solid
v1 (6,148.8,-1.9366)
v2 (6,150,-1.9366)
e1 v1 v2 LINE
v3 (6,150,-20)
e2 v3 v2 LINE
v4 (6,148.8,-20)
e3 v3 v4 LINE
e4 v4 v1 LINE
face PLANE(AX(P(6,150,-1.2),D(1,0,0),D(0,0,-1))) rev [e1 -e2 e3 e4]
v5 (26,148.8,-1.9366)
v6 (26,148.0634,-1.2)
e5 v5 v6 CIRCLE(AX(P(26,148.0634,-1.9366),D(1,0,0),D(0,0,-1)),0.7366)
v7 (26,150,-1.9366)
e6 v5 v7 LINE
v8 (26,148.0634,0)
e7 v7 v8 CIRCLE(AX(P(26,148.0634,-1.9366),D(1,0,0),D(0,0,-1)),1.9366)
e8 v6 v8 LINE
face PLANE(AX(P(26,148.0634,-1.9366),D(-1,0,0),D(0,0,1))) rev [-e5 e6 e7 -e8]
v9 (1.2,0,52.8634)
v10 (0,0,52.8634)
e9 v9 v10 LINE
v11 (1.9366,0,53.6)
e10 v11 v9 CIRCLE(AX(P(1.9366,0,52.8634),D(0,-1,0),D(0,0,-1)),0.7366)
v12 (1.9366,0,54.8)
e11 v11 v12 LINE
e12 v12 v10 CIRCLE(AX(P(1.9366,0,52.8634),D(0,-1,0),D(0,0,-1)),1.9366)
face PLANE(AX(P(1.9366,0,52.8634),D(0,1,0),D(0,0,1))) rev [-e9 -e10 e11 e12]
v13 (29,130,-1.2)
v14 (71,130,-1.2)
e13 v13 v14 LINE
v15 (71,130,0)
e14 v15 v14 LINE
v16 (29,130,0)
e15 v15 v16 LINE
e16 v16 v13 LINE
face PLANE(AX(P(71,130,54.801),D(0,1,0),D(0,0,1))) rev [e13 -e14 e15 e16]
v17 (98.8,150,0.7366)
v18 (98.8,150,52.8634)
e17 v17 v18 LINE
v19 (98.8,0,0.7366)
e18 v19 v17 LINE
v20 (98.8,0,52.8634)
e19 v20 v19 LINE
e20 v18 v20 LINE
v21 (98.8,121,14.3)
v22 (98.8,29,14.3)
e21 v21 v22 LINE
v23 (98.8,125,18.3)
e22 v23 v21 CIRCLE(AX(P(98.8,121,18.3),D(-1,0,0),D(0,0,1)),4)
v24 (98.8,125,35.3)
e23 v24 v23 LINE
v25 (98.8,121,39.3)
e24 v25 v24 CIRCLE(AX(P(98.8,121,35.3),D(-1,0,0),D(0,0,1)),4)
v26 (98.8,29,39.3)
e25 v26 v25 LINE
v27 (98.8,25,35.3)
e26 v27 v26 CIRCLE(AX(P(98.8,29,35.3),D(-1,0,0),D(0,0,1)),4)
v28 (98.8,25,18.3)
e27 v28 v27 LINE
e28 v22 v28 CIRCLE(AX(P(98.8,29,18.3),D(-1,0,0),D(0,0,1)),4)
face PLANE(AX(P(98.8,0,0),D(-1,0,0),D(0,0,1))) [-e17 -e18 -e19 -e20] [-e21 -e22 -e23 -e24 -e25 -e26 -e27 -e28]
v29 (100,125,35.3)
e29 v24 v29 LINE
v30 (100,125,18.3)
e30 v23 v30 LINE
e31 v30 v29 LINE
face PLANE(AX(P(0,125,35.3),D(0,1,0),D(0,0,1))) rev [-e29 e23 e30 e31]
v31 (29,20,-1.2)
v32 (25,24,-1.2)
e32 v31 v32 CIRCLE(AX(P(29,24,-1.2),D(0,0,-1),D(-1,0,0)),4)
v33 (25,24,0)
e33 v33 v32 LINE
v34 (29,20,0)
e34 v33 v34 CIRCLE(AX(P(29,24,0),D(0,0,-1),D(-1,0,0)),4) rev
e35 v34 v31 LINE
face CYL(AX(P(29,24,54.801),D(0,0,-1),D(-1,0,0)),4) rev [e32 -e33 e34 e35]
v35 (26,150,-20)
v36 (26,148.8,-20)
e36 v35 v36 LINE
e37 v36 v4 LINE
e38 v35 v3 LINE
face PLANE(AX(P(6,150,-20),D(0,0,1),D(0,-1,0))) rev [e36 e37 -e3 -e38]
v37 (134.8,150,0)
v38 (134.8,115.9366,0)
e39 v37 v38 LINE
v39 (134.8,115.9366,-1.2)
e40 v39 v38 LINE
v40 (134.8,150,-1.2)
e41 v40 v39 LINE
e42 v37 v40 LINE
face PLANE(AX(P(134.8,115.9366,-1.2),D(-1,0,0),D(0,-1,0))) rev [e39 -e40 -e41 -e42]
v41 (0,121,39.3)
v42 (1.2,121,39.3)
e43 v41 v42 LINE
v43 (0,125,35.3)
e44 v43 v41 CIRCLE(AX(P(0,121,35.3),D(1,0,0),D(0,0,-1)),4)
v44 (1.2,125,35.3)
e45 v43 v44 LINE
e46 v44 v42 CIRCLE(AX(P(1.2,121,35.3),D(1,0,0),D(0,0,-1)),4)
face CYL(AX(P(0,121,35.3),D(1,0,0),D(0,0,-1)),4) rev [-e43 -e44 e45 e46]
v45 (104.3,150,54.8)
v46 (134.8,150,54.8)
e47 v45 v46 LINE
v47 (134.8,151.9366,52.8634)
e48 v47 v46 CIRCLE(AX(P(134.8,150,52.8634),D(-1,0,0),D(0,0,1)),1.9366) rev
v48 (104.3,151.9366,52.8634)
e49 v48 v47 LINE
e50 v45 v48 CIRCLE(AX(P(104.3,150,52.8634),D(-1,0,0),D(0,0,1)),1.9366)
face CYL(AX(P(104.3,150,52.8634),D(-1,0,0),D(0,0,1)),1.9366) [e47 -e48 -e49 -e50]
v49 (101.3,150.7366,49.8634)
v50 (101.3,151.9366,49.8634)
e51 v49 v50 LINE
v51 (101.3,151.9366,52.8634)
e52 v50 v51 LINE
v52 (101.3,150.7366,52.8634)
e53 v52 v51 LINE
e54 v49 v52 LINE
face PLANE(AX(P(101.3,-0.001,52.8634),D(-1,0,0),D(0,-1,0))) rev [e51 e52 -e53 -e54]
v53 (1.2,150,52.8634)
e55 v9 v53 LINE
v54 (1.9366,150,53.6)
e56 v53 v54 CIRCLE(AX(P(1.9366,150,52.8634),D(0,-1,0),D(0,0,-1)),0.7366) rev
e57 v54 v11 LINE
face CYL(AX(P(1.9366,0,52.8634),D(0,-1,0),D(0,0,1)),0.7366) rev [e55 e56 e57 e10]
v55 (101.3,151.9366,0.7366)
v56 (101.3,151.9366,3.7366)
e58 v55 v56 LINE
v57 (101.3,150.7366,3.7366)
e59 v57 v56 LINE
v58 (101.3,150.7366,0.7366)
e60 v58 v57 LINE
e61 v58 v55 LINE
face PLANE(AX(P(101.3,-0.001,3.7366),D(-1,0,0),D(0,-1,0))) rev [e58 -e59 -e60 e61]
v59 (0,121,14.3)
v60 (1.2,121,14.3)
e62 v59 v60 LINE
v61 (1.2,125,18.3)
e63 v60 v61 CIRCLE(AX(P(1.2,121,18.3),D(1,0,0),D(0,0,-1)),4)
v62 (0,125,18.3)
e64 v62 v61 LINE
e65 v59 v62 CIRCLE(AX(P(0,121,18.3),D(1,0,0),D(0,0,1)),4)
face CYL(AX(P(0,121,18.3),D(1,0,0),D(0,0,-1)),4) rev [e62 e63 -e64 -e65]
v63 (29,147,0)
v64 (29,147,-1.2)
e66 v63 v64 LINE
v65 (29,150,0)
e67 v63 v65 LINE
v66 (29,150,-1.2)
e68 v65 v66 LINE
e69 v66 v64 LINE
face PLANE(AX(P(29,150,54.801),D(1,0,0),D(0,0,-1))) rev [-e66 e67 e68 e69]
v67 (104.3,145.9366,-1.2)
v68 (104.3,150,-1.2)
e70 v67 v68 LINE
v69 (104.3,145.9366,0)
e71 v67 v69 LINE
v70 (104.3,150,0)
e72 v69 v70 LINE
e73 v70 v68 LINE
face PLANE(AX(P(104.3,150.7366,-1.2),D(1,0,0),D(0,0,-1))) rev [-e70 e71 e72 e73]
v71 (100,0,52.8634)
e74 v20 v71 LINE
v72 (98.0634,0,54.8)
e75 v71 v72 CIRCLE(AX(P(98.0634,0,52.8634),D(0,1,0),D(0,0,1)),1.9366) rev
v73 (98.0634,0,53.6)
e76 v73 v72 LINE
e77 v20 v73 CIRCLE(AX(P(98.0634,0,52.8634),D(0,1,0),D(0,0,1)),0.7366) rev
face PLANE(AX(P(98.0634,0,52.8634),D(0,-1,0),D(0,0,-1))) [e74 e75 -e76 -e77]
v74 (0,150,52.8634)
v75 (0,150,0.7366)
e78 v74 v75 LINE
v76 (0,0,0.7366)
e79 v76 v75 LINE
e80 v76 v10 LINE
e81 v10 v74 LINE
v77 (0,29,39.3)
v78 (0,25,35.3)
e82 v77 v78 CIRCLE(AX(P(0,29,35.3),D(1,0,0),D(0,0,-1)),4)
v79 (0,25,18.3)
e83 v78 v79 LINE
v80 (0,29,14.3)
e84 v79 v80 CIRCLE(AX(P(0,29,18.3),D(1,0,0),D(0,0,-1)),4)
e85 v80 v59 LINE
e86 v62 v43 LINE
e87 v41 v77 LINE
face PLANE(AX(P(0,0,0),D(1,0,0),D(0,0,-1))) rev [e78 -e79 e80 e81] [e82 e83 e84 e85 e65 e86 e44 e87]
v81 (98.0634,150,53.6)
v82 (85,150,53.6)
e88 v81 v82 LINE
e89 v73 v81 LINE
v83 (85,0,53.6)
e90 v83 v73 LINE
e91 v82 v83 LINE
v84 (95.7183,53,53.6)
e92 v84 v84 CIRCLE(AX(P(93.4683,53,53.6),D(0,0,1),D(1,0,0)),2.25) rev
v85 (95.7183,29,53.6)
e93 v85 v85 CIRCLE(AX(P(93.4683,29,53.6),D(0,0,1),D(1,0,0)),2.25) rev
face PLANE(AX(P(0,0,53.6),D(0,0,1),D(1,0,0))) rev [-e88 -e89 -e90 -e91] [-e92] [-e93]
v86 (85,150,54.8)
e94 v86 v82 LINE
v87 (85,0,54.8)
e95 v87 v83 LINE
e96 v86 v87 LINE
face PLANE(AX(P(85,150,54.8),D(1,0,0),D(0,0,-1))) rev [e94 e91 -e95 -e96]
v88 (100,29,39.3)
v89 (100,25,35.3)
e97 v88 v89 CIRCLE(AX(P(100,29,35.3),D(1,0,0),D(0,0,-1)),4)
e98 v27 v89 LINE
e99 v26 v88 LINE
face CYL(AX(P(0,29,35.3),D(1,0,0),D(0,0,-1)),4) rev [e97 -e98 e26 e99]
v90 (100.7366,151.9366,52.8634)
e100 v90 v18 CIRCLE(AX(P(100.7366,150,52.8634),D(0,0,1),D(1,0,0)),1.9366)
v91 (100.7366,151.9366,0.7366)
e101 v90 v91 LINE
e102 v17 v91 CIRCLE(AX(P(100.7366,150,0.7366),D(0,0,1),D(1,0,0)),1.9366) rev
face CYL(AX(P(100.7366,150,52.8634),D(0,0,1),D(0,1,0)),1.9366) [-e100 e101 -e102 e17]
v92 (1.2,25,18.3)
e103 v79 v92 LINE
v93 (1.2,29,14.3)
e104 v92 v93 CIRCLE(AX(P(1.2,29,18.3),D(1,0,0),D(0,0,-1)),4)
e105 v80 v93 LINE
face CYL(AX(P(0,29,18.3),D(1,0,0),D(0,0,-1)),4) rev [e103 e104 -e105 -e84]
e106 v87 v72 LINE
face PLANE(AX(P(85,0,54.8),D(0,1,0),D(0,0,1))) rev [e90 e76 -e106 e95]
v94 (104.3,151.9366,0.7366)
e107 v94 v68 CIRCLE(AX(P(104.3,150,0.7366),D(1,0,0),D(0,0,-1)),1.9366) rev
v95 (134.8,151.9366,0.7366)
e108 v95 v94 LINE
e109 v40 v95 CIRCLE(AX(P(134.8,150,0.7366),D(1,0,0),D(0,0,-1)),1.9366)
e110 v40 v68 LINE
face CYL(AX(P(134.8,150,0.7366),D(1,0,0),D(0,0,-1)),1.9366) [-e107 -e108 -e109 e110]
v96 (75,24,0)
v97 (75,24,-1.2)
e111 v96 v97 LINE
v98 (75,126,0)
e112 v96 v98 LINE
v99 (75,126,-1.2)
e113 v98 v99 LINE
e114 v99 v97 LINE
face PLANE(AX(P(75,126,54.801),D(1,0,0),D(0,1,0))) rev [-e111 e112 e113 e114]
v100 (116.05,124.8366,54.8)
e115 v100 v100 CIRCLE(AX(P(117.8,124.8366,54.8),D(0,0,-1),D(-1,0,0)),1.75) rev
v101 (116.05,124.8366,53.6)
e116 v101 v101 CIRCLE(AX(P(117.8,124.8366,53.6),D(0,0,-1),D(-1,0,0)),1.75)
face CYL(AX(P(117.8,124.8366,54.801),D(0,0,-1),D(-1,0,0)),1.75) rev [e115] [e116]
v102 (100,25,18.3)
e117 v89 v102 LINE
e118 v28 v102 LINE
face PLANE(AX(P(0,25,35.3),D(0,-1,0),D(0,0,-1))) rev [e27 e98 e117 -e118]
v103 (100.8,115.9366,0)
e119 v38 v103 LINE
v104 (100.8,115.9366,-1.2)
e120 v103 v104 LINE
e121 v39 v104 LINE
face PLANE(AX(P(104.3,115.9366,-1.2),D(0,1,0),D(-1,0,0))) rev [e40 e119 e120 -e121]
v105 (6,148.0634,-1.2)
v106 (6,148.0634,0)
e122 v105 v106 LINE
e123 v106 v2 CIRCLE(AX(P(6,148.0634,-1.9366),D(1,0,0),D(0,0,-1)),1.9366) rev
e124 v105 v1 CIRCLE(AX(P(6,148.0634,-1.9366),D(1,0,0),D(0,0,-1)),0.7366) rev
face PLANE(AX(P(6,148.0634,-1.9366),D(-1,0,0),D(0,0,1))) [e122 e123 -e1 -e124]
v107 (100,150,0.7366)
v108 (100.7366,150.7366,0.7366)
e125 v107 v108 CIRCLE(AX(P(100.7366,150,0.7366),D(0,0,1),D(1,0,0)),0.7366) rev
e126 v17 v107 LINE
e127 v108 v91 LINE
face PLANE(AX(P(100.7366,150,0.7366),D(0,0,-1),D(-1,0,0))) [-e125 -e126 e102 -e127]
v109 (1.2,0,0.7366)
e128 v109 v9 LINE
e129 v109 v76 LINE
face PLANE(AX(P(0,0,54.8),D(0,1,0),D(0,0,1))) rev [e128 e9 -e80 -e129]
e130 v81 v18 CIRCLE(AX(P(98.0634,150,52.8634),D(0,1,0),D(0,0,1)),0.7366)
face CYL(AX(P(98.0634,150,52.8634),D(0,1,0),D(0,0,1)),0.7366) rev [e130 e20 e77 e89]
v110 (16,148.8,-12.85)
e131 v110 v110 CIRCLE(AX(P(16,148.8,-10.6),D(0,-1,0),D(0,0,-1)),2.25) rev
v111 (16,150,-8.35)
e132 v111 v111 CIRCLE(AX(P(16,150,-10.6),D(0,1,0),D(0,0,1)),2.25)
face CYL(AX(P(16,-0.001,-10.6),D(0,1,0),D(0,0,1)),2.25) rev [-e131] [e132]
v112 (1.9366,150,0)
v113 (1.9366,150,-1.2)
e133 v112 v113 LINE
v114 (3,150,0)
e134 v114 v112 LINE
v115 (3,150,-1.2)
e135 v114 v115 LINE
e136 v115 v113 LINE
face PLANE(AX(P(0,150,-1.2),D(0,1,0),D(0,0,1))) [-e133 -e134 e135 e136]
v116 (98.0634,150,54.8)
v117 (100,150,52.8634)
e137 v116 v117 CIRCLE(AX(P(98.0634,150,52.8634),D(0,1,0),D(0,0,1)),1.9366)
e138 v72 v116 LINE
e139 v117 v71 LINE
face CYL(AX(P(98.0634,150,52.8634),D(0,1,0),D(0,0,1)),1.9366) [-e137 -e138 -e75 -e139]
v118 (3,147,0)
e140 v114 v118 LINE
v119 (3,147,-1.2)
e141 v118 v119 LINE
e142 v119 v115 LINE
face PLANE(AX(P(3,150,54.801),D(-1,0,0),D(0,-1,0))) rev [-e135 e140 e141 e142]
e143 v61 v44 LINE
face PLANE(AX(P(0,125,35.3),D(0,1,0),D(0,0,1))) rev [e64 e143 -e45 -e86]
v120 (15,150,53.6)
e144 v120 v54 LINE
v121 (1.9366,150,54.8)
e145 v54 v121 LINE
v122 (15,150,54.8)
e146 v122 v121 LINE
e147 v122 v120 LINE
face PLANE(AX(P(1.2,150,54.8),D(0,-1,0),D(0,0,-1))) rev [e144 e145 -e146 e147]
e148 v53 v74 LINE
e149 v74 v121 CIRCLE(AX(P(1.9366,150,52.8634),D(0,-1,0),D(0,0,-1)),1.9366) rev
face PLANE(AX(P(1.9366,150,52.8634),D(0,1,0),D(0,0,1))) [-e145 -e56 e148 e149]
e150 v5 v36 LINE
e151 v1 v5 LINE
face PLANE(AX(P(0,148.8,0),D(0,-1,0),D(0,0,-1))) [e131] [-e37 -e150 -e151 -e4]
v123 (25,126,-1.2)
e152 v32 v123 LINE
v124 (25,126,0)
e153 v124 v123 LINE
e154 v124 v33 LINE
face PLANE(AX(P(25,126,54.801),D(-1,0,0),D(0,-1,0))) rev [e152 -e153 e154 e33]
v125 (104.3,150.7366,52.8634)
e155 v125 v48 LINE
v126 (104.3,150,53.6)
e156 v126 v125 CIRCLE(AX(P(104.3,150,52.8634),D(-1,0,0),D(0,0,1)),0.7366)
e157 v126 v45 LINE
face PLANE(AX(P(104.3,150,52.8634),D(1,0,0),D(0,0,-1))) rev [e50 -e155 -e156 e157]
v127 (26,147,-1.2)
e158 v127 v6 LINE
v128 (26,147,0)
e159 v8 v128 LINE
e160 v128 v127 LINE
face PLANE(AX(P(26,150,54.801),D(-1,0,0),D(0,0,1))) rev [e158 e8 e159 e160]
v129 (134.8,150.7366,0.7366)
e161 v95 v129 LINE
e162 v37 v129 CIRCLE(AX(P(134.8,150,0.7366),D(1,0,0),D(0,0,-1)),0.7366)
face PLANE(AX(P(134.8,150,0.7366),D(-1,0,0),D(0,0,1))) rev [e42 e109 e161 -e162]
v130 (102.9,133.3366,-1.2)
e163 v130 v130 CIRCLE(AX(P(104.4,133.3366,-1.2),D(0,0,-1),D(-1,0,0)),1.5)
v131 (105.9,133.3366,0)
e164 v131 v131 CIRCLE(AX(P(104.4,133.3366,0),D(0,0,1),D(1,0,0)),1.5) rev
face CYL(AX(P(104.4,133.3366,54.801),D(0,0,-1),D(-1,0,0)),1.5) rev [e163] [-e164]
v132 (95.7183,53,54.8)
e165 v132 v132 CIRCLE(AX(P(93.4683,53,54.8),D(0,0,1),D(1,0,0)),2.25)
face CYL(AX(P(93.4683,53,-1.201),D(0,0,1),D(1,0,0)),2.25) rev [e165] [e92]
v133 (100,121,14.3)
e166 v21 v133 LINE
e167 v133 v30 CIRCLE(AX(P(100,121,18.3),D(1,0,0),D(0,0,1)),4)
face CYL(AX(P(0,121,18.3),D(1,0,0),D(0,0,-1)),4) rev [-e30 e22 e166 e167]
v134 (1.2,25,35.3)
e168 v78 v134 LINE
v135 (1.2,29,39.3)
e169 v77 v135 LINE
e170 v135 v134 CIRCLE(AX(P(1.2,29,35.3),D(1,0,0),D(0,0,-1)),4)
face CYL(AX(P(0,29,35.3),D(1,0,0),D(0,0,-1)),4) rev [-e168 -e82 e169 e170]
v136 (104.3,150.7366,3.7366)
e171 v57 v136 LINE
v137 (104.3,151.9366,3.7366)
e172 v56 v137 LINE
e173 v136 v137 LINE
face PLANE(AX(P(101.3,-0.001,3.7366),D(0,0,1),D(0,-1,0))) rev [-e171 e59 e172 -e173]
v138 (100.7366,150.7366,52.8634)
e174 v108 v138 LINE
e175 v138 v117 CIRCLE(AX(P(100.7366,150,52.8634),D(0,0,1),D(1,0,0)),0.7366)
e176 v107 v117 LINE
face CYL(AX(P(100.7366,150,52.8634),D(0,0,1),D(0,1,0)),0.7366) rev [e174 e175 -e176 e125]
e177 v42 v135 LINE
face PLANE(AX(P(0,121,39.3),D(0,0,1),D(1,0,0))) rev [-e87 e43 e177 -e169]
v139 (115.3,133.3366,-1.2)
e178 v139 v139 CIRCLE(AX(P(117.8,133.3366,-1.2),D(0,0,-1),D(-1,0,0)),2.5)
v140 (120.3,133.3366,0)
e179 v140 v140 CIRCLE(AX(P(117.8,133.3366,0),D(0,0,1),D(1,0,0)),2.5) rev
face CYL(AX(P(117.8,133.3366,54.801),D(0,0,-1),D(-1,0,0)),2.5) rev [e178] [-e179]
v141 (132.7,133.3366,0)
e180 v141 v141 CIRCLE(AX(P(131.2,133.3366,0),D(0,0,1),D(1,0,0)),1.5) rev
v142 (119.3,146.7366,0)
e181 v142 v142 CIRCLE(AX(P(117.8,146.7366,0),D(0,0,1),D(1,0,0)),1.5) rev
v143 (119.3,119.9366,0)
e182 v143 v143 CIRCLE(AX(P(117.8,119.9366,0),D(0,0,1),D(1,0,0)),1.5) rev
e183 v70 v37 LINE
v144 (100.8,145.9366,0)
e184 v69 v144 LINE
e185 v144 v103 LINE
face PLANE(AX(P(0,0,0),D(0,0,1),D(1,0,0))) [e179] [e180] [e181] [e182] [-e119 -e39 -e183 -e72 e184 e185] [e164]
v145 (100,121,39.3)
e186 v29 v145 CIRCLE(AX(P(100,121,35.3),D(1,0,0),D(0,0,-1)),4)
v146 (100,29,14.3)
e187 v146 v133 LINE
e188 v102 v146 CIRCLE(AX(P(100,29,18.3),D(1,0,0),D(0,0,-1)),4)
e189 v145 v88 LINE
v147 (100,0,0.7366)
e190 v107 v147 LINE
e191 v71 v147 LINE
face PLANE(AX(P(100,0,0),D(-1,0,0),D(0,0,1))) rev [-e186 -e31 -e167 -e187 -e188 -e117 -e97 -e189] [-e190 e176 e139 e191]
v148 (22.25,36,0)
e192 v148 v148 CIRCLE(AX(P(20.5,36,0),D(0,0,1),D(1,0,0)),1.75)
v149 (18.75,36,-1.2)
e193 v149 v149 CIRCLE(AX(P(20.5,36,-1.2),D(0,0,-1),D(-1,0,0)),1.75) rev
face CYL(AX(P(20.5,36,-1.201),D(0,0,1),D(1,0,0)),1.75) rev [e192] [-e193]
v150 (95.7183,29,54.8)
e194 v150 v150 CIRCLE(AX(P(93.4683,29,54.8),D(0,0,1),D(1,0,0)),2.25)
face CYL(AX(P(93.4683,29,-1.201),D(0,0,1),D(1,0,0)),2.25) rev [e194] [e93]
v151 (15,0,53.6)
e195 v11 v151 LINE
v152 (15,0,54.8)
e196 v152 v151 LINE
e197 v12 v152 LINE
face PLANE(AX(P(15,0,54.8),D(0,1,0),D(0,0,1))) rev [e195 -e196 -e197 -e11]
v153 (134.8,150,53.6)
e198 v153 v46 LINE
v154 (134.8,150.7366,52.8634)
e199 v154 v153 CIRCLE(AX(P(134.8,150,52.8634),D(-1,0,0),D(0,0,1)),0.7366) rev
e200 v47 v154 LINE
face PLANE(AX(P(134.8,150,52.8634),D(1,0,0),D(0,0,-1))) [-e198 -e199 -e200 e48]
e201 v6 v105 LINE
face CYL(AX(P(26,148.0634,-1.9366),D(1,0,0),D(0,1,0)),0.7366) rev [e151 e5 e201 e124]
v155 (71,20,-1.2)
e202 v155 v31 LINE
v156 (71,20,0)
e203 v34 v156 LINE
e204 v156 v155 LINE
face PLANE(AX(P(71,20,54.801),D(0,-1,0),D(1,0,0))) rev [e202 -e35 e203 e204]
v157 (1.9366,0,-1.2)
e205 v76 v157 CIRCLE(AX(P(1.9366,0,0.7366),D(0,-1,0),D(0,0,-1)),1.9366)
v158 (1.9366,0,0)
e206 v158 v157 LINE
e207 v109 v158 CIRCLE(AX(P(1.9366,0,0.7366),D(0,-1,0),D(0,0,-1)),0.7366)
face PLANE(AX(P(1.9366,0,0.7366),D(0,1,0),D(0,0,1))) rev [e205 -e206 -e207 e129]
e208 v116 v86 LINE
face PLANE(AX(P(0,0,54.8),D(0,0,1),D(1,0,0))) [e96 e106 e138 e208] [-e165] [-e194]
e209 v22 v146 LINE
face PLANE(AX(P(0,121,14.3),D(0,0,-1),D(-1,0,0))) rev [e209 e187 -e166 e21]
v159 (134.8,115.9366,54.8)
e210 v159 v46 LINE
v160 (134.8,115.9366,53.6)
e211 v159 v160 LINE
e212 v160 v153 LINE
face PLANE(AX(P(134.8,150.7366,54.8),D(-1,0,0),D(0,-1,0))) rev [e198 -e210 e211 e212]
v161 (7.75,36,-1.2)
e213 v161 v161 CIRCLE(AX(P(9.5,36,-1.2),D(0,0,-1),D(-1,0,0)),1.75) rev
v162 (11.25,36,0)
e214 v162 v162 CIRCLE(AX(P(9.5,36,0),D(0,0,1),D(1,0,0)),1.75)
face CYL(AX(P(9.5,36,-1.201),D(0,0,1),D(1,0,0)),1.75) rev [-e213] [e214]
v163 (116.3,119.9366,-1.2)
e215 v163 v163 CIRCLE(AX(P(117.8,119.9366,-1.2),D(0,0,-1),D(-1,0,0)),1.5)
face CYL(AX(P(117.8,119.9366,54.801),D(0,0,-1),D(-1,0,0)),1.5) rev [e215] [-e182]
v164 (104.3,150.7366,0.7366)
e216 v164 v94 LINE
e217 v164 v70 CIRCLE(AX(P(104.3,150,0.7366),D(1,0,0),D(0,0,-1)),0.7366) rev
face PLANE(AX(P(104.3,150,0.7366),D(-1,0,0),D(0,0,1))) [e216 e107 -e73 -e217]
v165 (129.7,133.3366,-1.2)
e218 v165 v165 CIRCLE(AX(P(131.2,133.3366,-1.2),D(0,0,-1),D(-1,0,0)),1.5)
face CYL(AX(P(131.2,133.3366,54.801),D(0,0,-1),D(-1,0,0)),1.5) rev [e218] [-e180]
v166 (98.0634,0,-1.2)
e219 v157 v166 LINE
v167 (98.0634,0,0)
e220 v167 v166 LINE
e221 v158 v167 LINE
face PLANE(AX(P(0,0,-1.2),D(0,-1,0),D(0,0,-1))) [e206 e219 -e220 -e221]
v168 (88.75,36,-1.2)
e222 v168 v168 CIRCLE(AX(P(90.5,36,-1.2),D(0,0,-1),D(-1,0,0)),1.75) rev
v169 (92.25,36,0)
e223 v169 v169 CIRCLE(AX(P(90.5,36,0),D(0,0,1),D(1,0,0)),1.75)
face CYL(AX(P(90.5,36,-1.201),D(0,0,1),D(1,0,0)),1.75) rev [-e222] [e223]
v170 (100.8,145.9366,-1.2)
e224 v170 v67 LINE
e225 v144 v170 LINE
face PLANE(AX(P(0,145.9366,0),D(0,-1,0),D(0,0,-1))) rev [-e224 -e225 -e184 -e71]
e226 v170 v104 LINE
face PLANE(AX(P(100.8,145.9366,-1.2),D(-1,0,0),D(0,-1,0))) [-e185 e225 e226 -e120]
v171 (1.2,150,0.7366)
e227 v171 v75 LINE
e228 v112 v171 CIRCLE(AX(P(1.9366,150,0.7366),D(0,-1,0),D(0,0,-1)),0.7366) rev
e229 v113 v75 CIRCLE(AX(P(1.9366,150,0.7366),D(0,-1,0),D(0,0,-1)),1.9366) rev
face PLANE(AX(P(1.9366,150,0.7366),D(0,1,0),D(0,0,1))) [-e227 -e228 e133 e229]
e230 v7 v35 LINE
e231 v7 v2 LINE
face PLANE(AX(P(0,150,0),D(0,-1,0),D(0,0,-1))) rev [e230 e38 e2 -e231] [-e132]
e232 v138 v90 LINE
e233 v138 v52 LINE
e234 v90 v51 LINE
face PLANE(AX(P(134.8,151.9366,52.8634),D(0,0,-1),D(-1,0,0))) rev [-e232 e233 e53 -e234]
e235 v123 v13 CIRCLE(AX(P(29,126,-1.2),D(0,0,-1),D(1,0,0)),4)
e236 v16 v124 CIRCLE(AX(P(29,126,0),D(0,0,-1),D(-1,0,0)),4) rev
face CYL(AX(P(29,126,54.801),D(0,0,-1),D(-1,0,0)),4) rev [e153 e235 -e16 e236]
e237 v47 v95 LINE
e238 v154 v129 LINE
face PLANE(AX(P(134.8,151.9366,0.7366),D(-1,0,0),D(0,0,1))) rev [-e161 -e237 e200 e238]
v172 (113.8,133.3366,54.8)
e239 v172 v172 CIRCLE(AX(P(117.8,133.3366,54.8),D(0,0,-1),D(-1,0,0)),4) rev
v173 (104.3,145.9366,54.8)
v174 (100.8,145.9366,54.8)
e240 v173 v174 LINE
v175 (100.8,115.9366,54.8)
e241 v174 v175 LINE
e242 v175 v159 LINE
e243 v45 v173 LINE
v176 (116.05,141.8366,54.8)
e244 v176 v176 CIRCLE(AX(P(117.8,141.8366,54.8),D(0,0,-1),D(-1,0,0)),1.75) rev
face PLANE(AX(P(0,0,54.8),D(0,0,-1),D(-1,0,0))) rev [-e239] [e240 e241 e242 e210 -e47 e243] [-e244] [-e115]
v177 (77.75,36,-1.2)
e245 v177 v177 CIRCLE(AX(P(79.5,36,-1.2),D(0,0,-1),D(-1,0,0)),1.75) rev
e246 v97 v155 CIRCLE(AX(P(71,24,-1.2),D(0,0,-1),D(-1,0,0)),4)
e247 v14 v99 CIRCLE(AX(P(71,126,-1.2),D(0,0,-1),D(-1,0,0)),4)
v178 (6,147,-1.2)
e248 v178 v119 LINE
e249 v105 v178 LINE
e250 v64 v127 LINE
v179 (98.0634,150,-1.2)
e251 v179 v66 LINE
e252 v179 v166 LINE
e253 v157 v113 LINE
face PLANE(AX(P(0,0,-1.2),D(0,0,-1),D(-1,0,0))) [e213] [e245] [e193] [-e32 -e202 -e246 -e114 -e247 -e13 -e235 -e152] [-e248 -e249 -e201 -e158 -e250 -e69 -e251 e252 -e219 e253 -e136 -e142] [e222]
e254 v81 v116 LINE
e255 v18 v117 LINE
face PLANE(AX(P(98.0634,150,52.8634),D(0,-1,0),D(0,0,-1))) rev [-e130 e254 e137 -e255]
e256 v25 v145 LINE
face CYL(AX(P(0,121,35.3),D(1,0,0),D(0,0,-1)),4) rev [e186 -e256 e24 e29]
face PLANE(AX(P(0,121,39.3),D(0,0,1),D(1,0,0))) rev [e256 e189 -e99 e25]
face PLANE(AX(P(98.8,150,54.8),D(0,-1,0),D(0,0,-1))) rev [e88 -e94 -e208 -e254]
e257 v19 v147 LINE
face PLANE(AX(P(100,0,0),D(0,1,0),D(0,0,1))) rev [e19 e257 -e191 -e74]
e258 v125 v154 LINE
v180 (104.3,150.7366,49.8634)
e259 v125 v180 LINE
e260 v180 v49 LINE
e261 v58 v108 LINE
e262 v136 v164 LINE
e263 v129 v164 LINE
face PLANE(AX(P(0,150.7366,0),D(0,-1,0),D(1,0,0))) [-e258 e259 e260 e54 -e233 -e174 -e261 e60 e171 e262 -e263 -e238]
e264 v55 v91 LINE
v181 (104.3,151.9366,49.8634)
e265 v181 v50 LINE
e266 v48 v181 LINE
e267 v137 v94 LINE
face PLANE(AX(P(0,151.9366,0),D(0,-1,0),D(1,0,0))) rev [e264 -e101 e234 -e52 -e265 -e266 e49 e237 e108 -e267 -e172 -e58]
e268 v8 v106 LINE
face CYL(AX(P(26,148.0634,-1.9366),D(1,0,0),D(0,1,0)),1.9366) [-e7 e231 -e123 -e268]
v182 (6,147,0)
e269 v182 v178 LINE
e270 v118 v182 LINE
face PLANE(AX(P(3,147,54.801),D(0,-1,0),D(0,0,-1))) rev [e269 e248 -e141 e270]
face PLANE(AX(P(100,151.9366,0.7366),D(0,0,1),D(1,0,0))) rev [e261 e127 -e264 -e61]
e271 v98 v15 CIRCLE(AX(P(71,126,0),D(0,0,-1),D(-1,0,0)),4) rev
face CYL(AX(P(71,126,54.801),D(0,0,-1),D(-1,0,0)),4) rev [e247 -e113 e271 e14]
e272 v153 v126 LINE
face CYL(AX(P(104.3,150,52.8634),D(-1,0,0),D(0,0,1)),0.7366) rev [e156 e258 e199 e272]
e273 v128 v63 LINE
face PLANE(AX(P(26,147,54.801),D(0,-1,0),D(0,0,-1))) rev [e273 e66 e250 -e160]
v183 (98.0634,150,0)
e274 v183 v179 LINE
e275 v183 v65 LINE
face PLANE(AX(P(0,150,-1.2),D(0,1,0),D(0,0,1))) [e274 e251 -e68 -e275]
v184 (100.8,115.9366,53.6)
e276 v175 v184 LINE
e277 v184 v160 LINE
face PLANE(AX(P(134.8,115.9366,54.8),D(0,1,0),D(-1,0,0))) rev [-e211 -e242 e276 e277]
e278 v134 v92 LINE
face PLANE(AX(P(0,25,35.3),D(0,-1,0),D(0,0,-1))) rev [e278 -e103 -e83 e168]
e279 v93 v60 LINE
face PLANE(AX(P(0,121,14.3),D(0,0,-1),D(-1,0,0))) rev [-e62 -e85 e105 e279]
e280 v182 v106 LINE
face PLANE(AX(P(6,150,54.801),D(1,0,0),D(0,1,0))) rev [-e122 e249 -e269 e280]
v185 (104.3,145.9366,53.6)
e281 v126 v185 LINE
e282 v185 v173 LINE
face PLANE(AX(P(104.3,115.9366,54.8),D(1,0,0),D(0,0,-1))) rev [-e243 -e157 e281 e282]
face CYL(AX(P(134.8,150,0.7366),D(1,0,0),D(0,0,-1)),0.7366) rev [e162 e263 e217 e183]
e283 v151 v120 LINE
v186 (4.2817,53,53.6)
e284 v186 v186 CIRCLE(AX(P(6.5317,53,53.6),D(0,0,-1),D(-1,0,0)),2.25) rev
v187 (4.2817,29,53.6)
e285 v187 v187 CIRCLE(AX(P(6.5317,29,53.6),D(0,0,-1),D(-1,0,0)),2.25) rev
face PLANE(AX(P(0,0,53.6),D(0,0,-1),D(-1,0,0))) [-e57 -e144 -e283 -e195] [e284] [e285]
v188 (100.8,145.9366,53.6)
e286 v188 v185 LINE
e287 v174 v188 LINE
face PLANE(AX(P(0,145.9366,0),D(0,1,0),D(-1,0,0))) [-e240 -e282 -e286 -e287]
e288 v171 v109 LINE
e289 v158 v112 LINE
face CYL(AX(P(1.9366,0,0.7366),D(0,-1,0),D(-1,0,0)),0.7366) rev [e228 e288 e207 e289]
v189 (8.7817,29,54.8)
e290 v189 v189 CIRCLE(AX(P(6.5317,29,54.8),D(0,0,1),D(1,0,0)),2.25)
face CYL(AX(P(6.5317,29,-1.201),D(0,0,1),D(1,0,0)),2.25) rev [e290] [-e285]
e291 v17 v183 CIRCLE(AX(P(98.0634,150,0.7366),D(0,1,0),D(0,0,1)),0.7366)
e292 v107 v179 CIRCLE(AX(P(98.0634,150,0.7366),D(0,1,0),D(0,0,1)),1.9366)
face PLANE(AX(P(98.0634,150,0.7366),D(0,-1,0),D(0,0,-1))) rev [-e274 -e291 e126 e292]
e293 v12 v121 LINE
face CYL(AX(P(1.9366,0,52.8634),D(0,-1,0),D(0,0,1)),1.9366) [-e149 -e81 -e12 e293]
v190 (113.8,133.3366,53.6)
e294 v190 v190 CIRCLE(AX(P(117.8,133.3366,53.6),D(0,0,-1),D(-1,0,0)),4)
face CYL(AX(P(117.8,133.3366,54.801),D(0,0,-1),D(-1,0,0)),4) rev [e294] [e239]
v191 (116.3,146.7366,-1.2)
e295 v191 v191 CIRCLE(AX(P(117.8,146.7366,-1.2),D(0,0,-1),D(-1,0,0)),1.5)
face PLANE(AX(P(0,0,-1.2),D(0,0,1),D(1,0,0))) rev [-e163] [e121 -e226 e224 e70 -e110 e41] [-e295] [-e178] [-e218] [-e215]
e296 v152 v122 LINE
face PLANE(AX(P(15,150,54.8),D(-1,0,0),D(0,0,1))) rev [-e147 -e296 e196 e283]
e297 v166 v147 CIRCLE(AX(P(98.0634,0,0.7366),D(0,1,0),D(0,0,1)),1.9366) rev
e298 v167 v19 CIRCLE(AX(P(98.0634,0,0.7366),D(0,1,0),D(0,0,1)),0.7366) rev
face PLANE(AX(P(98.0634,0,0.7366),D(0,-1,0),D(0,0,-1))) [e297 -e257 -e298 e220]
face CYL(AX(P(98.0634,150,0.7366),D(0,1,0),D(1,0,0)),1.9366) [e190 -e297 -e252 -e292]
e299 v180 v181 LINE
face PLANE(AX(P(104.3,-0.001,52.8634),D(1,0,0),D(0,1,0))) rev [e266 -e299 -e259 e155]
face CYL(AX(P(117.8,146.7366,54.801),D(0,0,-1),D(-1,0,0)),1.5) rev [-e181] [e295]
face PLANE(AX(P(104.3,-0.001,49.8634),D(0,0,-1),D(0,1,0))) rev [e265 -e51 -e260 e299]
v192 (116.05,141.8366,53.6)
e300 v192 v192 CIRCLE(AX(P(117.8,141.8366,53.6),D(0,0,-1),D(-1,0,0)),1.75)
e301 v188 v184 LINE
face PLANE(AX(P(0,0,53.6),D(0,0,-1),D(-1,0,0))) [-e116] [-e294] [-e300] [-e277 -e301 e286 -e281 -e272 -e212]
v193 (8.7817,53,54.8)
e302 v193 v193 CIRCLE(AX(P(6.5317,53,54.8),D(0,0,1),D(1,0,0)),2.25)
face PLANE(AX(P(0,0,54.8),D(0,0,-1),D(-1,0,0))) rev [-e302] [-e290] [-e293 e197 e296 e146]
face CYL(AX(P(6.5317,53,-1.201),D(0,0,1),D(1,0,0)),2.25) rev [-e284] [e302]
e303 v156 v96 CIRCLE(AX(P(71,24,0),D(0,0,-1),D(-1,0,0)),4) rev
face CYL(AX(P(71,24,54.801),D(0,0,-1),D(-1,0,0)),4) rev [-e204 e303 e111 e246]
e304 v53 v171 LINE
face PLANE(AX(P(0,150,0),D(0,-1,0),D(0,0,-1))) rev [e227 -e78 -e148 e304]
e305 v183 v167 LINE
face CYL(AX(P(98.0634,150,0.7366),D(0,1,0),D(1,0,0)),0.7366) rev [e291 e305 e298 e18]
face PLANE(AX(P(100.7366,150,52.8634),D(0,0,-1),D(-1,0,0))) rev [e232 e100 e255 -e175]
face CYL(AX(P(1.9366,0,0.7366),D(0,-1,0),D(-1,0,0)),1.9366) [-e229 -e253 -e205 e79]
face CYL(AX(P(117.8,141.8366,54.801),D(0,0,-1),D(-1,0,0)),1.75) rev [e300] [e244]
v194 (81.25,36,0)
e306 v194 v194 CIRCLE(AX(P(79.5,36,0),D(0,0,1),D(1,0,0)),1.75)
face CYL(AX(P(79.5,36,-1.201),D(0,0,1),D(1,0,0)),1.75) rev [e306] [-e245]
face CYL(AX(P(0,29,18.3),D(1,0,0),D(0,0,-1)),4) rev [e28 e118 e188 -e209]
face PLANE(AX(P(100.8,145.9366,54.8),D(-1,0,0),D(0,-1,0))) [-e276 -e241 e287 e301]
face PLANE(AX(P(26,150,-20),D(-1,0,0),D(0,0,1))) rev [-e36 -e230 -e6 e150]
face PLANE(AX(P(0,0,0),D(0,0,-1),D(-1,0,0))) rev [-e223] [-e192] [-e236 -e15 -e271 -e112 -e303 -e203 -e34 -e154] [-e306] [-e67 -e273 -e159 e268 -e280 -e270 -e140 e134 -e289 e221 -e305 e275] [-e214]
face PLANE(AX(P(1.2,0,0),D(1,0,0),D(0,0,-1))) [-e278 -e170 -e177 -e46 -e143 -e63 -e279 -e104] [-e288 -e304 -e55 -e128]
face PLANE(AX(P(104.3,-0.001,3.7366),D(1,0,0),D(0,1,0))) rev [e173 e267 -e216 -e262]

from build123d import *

# Parameters (mm, degrees)
SKETCH_1_W                         = 100
SKETCH_1_H                         = 150
SM_BASE_FLANGE_1_DEPTH             = 1.2
SM_EDGE_FLANGE_1_STRIP_W           = 6.2732
SM_EDGE_FLANGE_1_STRIP_H           = 1.2
SM_EDGE_FLANGE_1_STRIP_CUT_DEPTH   = 150
SM_EDGE_FLANGE_1_STRIP_2_W         = 6.2732
SM_EDGE_FLANGE_1_STRIP_2_H         = 1.2
SM_EDGE_FLANGE_1_STRIP_CUT_2_DEPTH = 150
SM_EDGE_FLANGE_1_DEPTH             = 150
SM_EDGE_FLANGE_1_BEND_DEPTH        = 150
SM_EDGE_FLANGE_2_STRIP_W           = 6.2732
SM_EDGE_FLANGE_2_STRIP_H           = 1.2
SM_EDGE_FLANGE_2_STRIP_CUT_DEPTH   = 150
SM_EDGE_FLANGE_2_STRIP_2_W         = 6.2732
SM_EDGE_FLANGE_2_STRIP_2_H         = 1.2
SM_EDGE_FLANGE_2_STRIP_CUT_2_DEPTH = 150
SM_EDGE_FLANGE_2_DEPTH             = 150
SM_EDGE_FLANGE_2_BEND_DEPTH        = 150
CUT_EXTRUDE_1_REACH                = 190.775
CUT_EXTRUDE_2_DEPTH                = 189.422503964
CUT_EXTRUDE_3_REACH                = 190.775
SKETCH_21_R                        = 2.25
CUT_EXTRUDE_4_REACH                = 190.423
SKETCH_22_R                        = 1.75
SM_EDGE_FLANGE_3_DEPTH             = 52.1268
CUT_EXTRUDE_5_REACH                = 212.378
SKETCH_26_W                        = 3
SKETCH_26_H                        = 3
SM_EDGE_FLANGE_4_DEPTH             = 30.5
SM_EDGE_FLANGE_4_BEND_DEPTH        = 30.5
SKETCH_33_W                        = 3.5
SKETCH_33_H                        = 1.2
EXTRUDE_1_DEPTH                    = 30
CUT_EXTRUDE_6_REACH                = 212.694
SKETCH_34_R                        = 2.5
SKETCH_34_R_2                      = 1.5
CUT_EXTRUDE_7_REACH                = 212.378
SKETCH_35_R                        = 4
SKETCH_35_R_2                      = 1.75
CUT_EXTRUDE_8_REACH                = 212.694
SKETCH_36_W                        = 3
SKETCH_36_H                        = 3
SM_EDGE_FLANGE_5_STRIP_W           = 6.2732
SM_EDGE_FLANGE_5_STRIP_H           = 1.2
SM_EDGE_FLANGE_5_STRIP_CUT_DEPTH   = 20
SM_EDGE_FLANGE_5_DEPTH             = 20
CUT_EXTRUDE_9_REACH                = 210.983
SKETCH_40_R                        = 2.25


# Sheet-metal steps are written as plain solids
with BuildPart() as part:
    # Sketch 1 → Базовая кромка1 (new body)
    with BuildSketch(Plane.XY):
        with Locations((50, 75)):
            Rectangle(SKETCH_1_W, SKETCH_1_H)
    extrude(amount=-SM_BASE_FLANGE_1_DEPTH)

    # Ребро-кромка1 strip (across the edge) → Ребро-кромка1 strip cut (cut)
    with BuildSketch(Plane(origin=(100, 0, 0), x_dir=(-1, 0, 0), z_dir=(0, 1, 0))):
        with Locations((-1.2, -0.6)):
            Rectangle(SM_EDGE_FLANGE_1_STRIP_W, SM_EDGE_FLANGE_1_STRIP_H)
    extrude(amount=SM_EDGE_FLANGE_1_STRIP_CUT_DEPTH, mode=Mode.SUBTRACT)

    # Ребро-кромка1 strip 2 (across the edge) → Ребро-кромка1 strip cut 2 (cut)
    with BuildSketch(Plane.XZ.offset(-150)):
        with Locations((-1.2, -0.6)):
            Rectangle(SM_EDGE_FLANGE_1_STRIP_2_W, SM_EDGE_FLANGE_1_STRIP_2_H)
    extrude(amount=SM_EDGE_FLANGE_1_STRIP_CUT_2_DEPTH, mode=Mode.SUBTRACT)

    # Ребро-кромка1 section (across the edge) → Ребро-кромка1 (add)
    with BuildSketch(Plane(origin=(100, 0, 0), x_dir=(-1, 0, 0), z_dir=(0, 1, 0))):
        with BuildLine():
            Line((0, 0.7366), (0, 54.8))
            Line((0, 54.8), (1.2, 54.8))
            Line((1.2, 54.8), (1.2, 0.7366))
            ThreePointArc((1.2, 0.7366), (1.415745145, 0.215745145), (1.9366, 0))
            Line((1.9366, 0), (1.9366, -1.2))
            ThreePointArc((1.9366, -1.2), (0.567217008, -0.632782992), (0, 0.7366))
        make_face()
    extrude(amount=SM_EDGE_FLANGE_1_DEPTH)

    # Ребро-кромка1 section 2 (across the edge) → Ребро-кромка1 bend (add)
    with BuildSketch(Plane.XZ.offset(-150)):
        with BuildLine():
            Line((0, 0.7366), (0, 54.8))
            Line((0, 54.8), (1.2, 54.8))
            Line((1.2, 54.8), (1.2, 0.7366))
            ThreePointArc((1.2, 0.7366), (1.415745145, 0.215745145), (1.9366, 0))
            Line((1.9366, 0), (1.9366, -1.2))
            ThreePointArc((1.9366, -1.2), (0.567217008, -0.632782992), (0, 0.7366))
        make_face()
    extrude(amount=SM_EDGE_FLANGE_1_BEND_DEPTH)

    # Ребро-кромка2 strip (across the edge) → Ребро-кромка2 strip cut (cut)
    with BuildSketch(Plane(origin=(1.2, 150, 54.8), x_dir=(0, 0, -1), z_dir=(0, -1, 0))):
        with Locations((-1.2, -0.6)):
            Rectangle(SM_EDGE_FLANGE_2_STRIP_W, SM_EDGE_FLANGE_2_STRIP_H)
    extrude(amount=SM_EDGE_FLANGE_2_STRIP_CUT_DEPTH, mode=Mode.SUBTRACT)

    # Ребро-кромка2 strip 2 (across the edge) → Ребро-кромка2 strip cut 2 (cut)
    with BuildSketch(Plane(origin=(98.8, 0, 54.8), x_dir=(0, 0, -1), z_dir=(0, 1, 0))):
        with Locations((-1.2, -0.6)):
            Rectangle(SM_EDGE_FLANGE_2_STRIP_2_W, SM_EDGE_FLANGE_2_STRIP_2_H)
    extrude(amount=SM_EDGE_FLANGE_2_STRIP_CUT_2_DEPTH, mode=Mode.SUBTRACT)

    # Ребро-кромка2 section (across the edge) → Ребро-кромка2 (add)
    with BuildSketch(Plane(origin=(1.2, 150, 54.8), x_dir=(0, 0, -1), z_dir=(0, -1, 0))):
        with BuildLine():
            Line((0, 0.7366), (0, 13.8))
            Line((0, 13.8), (1.2, 13.8))
            Line((1.2, 13.8), (1.2, 0.7366))
            ThreePointArc((1.2, 0.7366), (1.415745145, 0.215745145), (1.9366, 0))
            Line((1.9366, 0), (1.9366, -1.2))
            ThreePointArc((1.9366, -1.2), (0.567217008, -0.632782992), (0, 0.7366))
        make_face()
    extrude(amount=SM_EDGE_FLANGE_2_DEPTH)

    # Ребро-кромка2 section 2 (across the edge) → Ребро-кромка2 bend (add)
    with BuildSketch(Plane(origin=(98.8, 0, 54.8), x_dir=(0, 0, -1), z_dir=(0, 1, 0))):
        with BuildLine():
            Line((0, 0.7366), (0, 13.8))
            Line((0, 13.8), (1.2, 13.8))
            Line((1.2, 13.8), (1.2, 0.7366))
            ThreePointArc((1.2, 0.7366), (1.415745145, 0.215745145), (1.9366, 0))
            Line((1.9366, 0), (1.9366, -1.2))
            ThreePointArc((1.9366, -1.2), (0.567217008, -0.632782992), (0, 0.7366))
        make_face()
    extrude(amount=SM_EDGE_FLANGE_2_BEND_DEPTH)

    # Эскиз19 → Вырез-Вытянуть1 (cut, up to next)
    with BuildSketch(Plane(origin=(0, 0, -1.2), x_dir=(-1, 0, 0), z_dir=(0, 0, -1)), mode=Mode.PRIVATE) as cut_extrude_1_sk1:
        with BuildLine():
            Line((-71, 130), (-29, 130))
            ThreePointArc((-29, 130), (-26.171572875, 128.828427125), (-25, 126))
            Line((-25, 126), (-25, 24))
            ThreePointArc((-25, 24), (-26.171572875, 21.171572875), (-29, 20))
            Line((-29, 20), (-71, 20))
            ThreePointArc((-71, 20), (-73.828427125, 21.171572875), (-75, 24))
            Line((-75, 24), (-75, 126))
            ThreePointArc((-75, 126), (-73.828427125, 128.828427125), (-71, 130))
        make_face()
    cut_extrude_1_tool1 = extrude(cut_extrude_1_sk1.sketch, amount=-CUT_EXTRUDE_1_REACH, mode=Mode.PRIVATE) & part.part
    add(cut_extrude_1_tool1.solids().sort_by_distance((50, 75, -1.2))[0], mode=Mode.SUBTRACT)

    # Эскиз20 → Вырез-Вытянуть2 (cut, through all)
    with BuildSketch(Plane(origin=(100, 0, 0), x_dir=(0, 0, -1), z_dir=(1, 0, 0))):
        with BuildLine():
            Line((-35.3, 125), (-18.3, 125))
            ThreePointArc((-18.3, 125), (-15.471572875, 123.828427125), (-14.3, 121))
            Line((-14.3, 121), (-14.3, 29))
            ThreePointArc((-14.3, 29), (-15.471572875, 26.171572875), (-18.3, 25))
            Line((-18.3, 25), (-35.3, 25))
            ThreePointArc((-35.3, 25), (-38.128427125, 26.171572875), (-39.3, 29))
            Line((-39.3, 29), (-39.3, 121))
            ThreePointArc((-39.3, 121), (-38.128427125, 123.828427125), (-35.3, 125))
        make_face()
    extrude(amount=-CUT_EXTRUDE_2_DEPTH, mode=Mode.SUBTRACT)

    # Эскиз21 → Вырез-Вытянуть3 (cut, up to next)
    with BuildSketch(Plane.XY.offset(54.8), mode=Mode.PRIVATE) as cut_extrude_3_sk1:
        with Locations((6.5317, 53)):
            Circle(SKETCH_21_R)
    cut_extrude_3_tool1 = extrude(cut_extrude_3_sk1.sketch, amount=-CUT_EXTRUDE_3_REACH, mode=Mode.PRIVATE) & part.part
    # Эскиз21 → Вырез-Вытянуть3 (cut, up to next)
    with BuildSketch(Plane.XY.offset(54.8), mode=Mode.PRIVATE) as cut_extrude_3_sk2:
        with Locations((6.5317, 29)):
            Circle(SKETCH_21_R)
    cut_extrude_3_tool2 = extrude(cut_extrude_3_sk2.sketch, amount=-CUT_EXTRUDE_3_REACH, mode=Mode.PRIVATE) & part.part
    # Эскиз21 → Вырез-Вытянуть3 (cut, up to next)
    with BuildSketch(Plane.XY.offset(54.8), mode=Mode.PRIVATE) as cut_extrude_3_sk3:
        with Locations((93.4683, 53)):
            Circle(SKETCH_21_R)
    cut_extrude_3_tool3 = extrude(cut_extrude_3_sk3.sketch, amount=-CUT_EXTRUDE_3_REACH, mode=Mode.PRIVATE) & part.part
    # Эскиз21 → Вырез-Вытянуть3 (cut, up to next)
    with BuildSketch(Plane.XY.offset(54.8), mode=Mode.PRIVATE) as cut_extrude_3_sk4:
        with Locations((93.4683, 29)):
            Circle(SKETCH_21_R)
    cut_extrude_3_tool4 = extrude(cut_extrude_3_sk4.sketch, amount=-CUT_EXTRUDE_3_REACH, mode=Mode.PRIVATE) & part.part
    add(cut_extrude_3_tool1.solids().sort_by_distance((6.5317, 53, 54.8))[0], mode=Mode.SUBTRACT)
    add(cut_extrude_3_tool2.solids().sort_by_distance((6.5317, 29, 54.8))[0], mode=Mode.SUBTRACT)
    add(cut_extrude_3_tool3.solids().sort_by_distance((93.4683, 53, 54.8))[0], mode=Mode.SUBTRACT)
    add(cut_extrude_3_tool4.solids().sort_by_distance((93.4683, 29, 54.8))[0], mode=Mode.SUBTRACT)

    # Эскиз22 → Вырез-Вытянуть4 (cut, up to next)
    with BuildSketch(Plane.XY, mode=Mode.PRIVATE) as cut_extrude_4_sk1:
        with Locations((90.5, 36)):
            Circle(SKETCH_22_R)
    cut_extrude_4_tool1 = extrude(cut_extrude_4_sk1.sketch, amount=-CUT_EXTRUDE_4_REACH, mode=Mode.PRIVATE) & part.part
    # Эскиз22 → Вырез-Вытянуть4 (cut, up to next)
    with BuildSketch(Plane.XY, mode=Mode.PRIVATE) as cut_extrude_4_sk2:
        with Locations((79.5, 36)):
            Circle(SKETCH_22_R)
    cut_extrude_4_tool2 = extrude(cut_extrude_4_sk2.sketch, amount=-CUT_EXTRUDE_4_REACH, mode=Mode.PRIVATE) & part.part
    # Эскиз22 → Вырез-Вытянуть4 (cut, up to next)
    with BuildSketch(Plane.XY, mode=Mode.PRIVATE) as cut_extrude_4_sk3:
        with Locations((20.5, 36)):
            Circle(SKETCH_22_R)
    cut_extrude_4_tool3 = extrude(cut_extrude_4_sk3.sketch, amount=-CUT_EXTRUDE_4_REACH, mode=Mode.PRIVATE) & part.part
    # Эскиз22 → Вырез-Вытянуть4 (cut, up to next)
    with BuildSketch(Plane.XY, mode=Mode.PRIVATE) as cut_extrude_4_sk4:
        with Locations((9.5, 36)):
            Circle(SKETCH_22_R)
    cut_extrude_4_tool4 = extrude(cut_extrude_4_sk4.sketch, amount=-CUT_EXTRUDE_4_REACH, mode=Mode.PRIVATE) & part.part
    add(cut_extrude_4_tool1.solids().sort_by_distance((90.5, 36, 0))[0], mode=Mode.SUBTRACT)
    add(cut_extrude_4_tool2.solids().sort_by_distance((79.5, 36, 0))[0], mode=Mode.SUBTRACT)
    add(cut_extrude_4_tool3.solids().sort_by_distance((20.5, 36, 0))[0], mode=Mode.SUBTRACT)
    add(cut_extrude_4_tool4.solids().sort_by_distance((9.5, 36, 0))[0], mode=Mode.SUBTRACT)

    # Ребро-кромка3 section (across the edge) → Ребро-кромка3 (add)
    with BuildSketch(Plane(origin=(100, 150.7366, 0.7366), x_dir=(0, -1, 0), z_dir=(0, 0, 1))):
        with BuildLine():
            Line((-1.2, 0.7366), (-1.2, 34.8))
            Line((-1.2, 34.8), (0, 34.8))
            Line((0, 34.8), (0, 0.7366))
            ThreePointArc((0, 0.7366), (0.215745145, 0.215745145), (0.7366, 0))
            Line((0.7366, 0), (0.7366, -1.2))
            ThreePointArc((0.7366, -1.2), (-0.632782992, -0.632782992), (-1.2, 0.7366))
        make_face()
    extrude(amount=SM_EDGE_FLANGE_3_DEPTH)

    # Эскиз26 → Вырез-Вытянуть5 (cut, up to next)
    with BuildSketch(Plane(origin=(0, 151.9366, 0), x_dir=(1, 0, 0), z_dir=(0, 1, 0)), mode=Mode.PRIVATE) as cut_extrude_5_sk1:
        with Locations((102.8, -51.3634)):
            Rectangle(SKETCH_26_W, SKETCH_26_H)
    cut_extrude_5_tool1 = extrude(cut_extrude_5_sk1.sketch, amount=-CUT_EXTRUDE_5_REACH, mode=Mode.PRIVATE) & part.part
    # Эскиз26 → Вырез-Вытянуть5 (cut, up to next)
    with BuildSketch(Plane(origin=(0, 151.9366, 0), x_dir=(1, 0, 0), z_dir=(0, 1, 0)), mode=Mode.PRIVATE) as cut_extrude_5_sk2:
        with Locations((102.8, -2.2366)):
            Rectangle(SKETCH_26_W, SKETCH_26_H)
    cut_extrude_5_tool2 = extrude(cut_extrude_5_sk2.sketch, amount=-CUT_EXTRUDE_5_REACH, mode=Mode.PRIVATE) & part.part
    add(cut_extrude_5_tool1.solids().sort_by_distance((102.8, 151.9366, 51.3634))[0], mode=Mode.SUBTRACT)
    add(cut_extrude_5_tool2.solids().sort_by_distance((102.8, 151.9366, 2.2366))[0], mode=Mode.SUBTRACT)

    # Ребро-кромка4 section (across the edge) → Ребро-кромка4 (add)
    with BuildSketch(Plane(origin=(134.8, 150.7366, 53.6), x_dir=(0, 0, -1), z_dir=(-1, 0, 0))):
        with BuildLine():
            Line((-1.2, 0.7366), (-1.2, 34.8))
            Line((-1.2, 34.8), (0, 34.8))
            Line((0, 34.8), (0, 0.7366))
            ThreePointArc((0, 0.7366), (0.215745145, 0.215745145), (0.7366, 0))
            Line((0.7366, 0), (0.7366, -1.2))
            ThreePointArc((0.7366, -1.2), (-0.632782992, -0.632782992), (-1.2, 0.7366))
        make_face()
    extrude(amount=SM_EDGE_FLANGE_4_DEPTH)

    # Ребро-кромка4 section 2 (across the edge) → Ребро-кромка4 bend (add)
    with BuildSketch(Plane(origin=(104.3, 150.7366, 0), x_dir=(0, 0, 1), z_dir=(1, 0, 0))):
        with BuildLine():
            Line((-1.2, 0.7366), (-1.2, 34.8))
            Line((-1.2, 34.8), (0, 34.8))
            Line((0, 34.8), (0, 0.7366))
            ThreePointArc((0, 0.7366), (0.215745145, 0.215745145), (0.7366, 0))
            Line((0.7366, 0), (0.7366, -1.2))
            ThreePointArc((0.7366, -1.2), (-0.632782992, -0.632782992), (-1.2, 0.7366))
        make_face()
    extrude(amount=SM_EDGE_FLANGE_4_BEND_DEPTH)

    # Эскиз33 → Бобышка-Вытянуть1 (add)
    with BuildSketch(Plane.XZ.offset(-115.9366)):
        with Locations((102.55, 54.2)):
            Rectangle(SKETCH_33_W, SKETCH_33_H)
        with Locations((102.55, -0.6)):
            Rectangle(SKETCH_33_W, SKETCH_33_H)
    extrude(amount=-EXTRUDE_1_DEPTH)

    # Эскиз34 → Вырез-Вытянуть6 (cut, up to next)
    with BuildSketch(Plane(origin=(0, 0, -1.2), x_dir=(-1, 0, 0), z_dir=(0, 0, -1)), mode=Mode.PRIVATE) as cut_extrude_6_sk1:
        with Locations((-117.8, 133.3366)):
            Circle(SKETCH_34_R)
    cut_extrude_6_tool1 = extrude(cut_extrude_6_sk1.sketch, amount=-CUT_EXTRUDE_6_REACH, mode=Mode.PRIVATE) & part.part
    # Эскиз34 → Вырез-Вытянуть6 (cut, up to next)
    with BuildSketch(Plane(origin=(0, 0, -1.2), x_dir=(-1, 0, 0), z_dir=(0, 0, -1)), mode=Mode.PRIVATE) as cut_extrude_6_sk2:
        with Locations((-117.8, 146.7366)):
            Circle(SKETCH_34_R_2)
    cut_extrude_6_tool2 = extrude(cut_extrude_6_sk2.sketch, amount=-CUT_EXTRUDE_6_REACH, mode=Mode.PRIVATE) & part.part
    # Эскиз34 → Вырез-Вытянуть6 (cut, up to next)
    with BuildSketch(Plane(origin=(0, 0, -1.2), x_dir=(-1, 0, 0), z_dir=(0, 0, -1)), mode=Mode.PRIVATE) as cut_extrude_6_sk3:
        with Locations((-131.2, 133.3366)):
            Circle(SKETCH_34_R_2)
    cut_extrude_6_tool3 = extrude(cut_extrude_6_sk3.sketch, amount=-CUT_EXTRUDE_6_REACH, mode=Mode.PRIVATE) & part.part
    # Эскиз34 → Вырез-Вытянуть6 (cut, up to next)
    with BuildSketch(Plane(origin=(0, 0, -1.2), x_dir=(-1, 0, 0), z_dir=(0, 0, -1)), mode=Mode.PRIVATE) as cut_extrude_6_sk4:
        with Locations((-117.8, 119.9366)):
            Circle(SKETCH_34_R_2)
    cut_extrude_6_tool4 = extrude(cut_extrude_6_sk4.sketch, amount=-CUT_EXTRUDE_6_REACH, mode=Mode.PRIVATE) & part.part
    # Эскиз34 → Вырез-Вытянуть6 (cut, up to next)
    with BuildSketch(Plane(origin=(0, 0, -1.2), x_dir=(-1, 0, 0), z_dir=(0, 0, -1)), mode=Mode.PRIVATE) as cut_extrude_6_sk5:
        with Locations((-104.4, 133.3366)):
            Circle(SKETCH_34_R_2)
    cut_extrude_6_tool5 = extrude(cut_extrude_6_sk5.sketch, amount=-CUT_EXTRUDE_6_REACH, mode=Mode.PRIVATE) & part.part
    add(cut_extrude_6_tool1.solids().sort_by_distance((117.8, 133.3366, -1.2))[0], mode=Mode.SUBTRACT)
    add(cut_extrude_6_tool2.solids().sort_by_distance((117.8, 146.7366, -1.2))[0], mode=Mode.SUBTRACT)
    add(cut_extrude_6_tool3.solids().sort_by_distance((131.2, 133.3366, -1.2))[0], mode=Mode.SUBTRACT)
    add(cut_extrude_6_tool4.solids().sort_by_distance((117.8, 119.9366, -1.2))[0], mode=Mode.SUBTRACT)
    add(cut_extrude_6_tool5.solids().sort_by_distance((104.4, 133.3366, -1.2))[0], mode=Mode.SUBTRACT)

    # Эскиз35 → Вырез-Вытянуть7 (cut, up to next)
    with BuildSketch(Plane(origin=(0, 0, 53.6), x_dir=(-1, 0, 0), z_dir=(0, 0, -1)), mode=Mode.PRIVATE) as cut_extrude_7_sk1:
        with Locations((-117.8, 133.3366)):
            Circle(SKETCH_35_R)
    cut_extrude_7_tool1 = extrude(cut_extrude_7_sk1.sketch, amount=-CUT_EXTRUDE_7_REACH, mode=Mode.PRIVATE) & part.part
    # Эскиз35 → Вырез-Вытянуть7 (cut, up to next)
    with BuildSketch(Plane(origin=(0, 0, 53.6), x_dir=(-1, 0, 0), z_dir=(0, 0, -1)), mode=Mode.PRIVATE) as cut_extrude_7_sk2:
        with Locations((-117.8, 141.8366)):
            Circle(SKETCH_35_R_2)
    cut_extrude_7_tool2 = extrude(cut_extrude_7_sk2.sketch, amount=-CUT_EXTRUDE_7_REACH, mode=Mode.PRIVATE) & part.part
    # Эскиз35 → Вырез-Вытянуть7 (cut, up to next)
    with BuildSketch(Plane(origin=(0, 0, 53.6), x_dir=(-1, 0, 0), z_dir=(0, 0, -1)), mode=Mode.PRIVATE) as cut_extrude_7_sk3:
        with Locations((-117.8, 124.8366)):
            Circle(SKETCH_35_R_2)
    cut_extrude_7_tool3 = extrude(cut_extrude_7_sk3.sketch, amount=-CUT_EXTRUDE_7_REACH, mode=Mode.PRIVATE) & part.part
    add(cut_extrude_7_tool1.solids().sort_by_distance((117.8, 133.3366, 53.6))[0], mode=Mode.SUBTRACT)
    add(cut_extrude_7_tool2.solids().sort_by_distance((117.8, 141.8366, 53.6))[0], mode=Mode.SUBTRACT)
    add(cut_extrude_7_tool3.solids().sort_by_distance((117.8, 124.8366, 53.6))[0], mode=Mode.SUBTRACT)

    # Эскиз36 → Вырез-Вытянуть8 (cut, up to next)
    with BuildSketch(Plane(origin=(0, 0, -1.2), x_dir=(-1, 0, 0), z_dir=(0, 0, -1)), mode=Mode.PRIVATE) as cut_extrude_8_sk1:
        with Locations((-4.5, 148.5)):
            Rectangle(SKETCH_36_W, SKETCH_36_H)
    cut_extrude_8_tool1 = extrude(cut_extrude_8_sk1.sketch, amount=-CUT_EXTRUDE_8_REACH, mode=Mode.PRIVATE) & part.part
    # Эскиз36 → Вырез-Вытянуть8 (cut, up to next)
    with BuildSketch(Plane(origin=(0, 0, -1.2), x_dir=(-1, 0, 0), z_dir=(0, 0, -1)), mode=Mode.PRIVATE) as cut_extrude_8_sk2:
        with Locations((-27.5, 148.5)):
            Rectangle(SKETCH_36_W, SKETCH_36_H)
    cut_extrude_8_tool2 = extrude(cut_extrude_8_sk2.sketch, amount=-CUT_EXTRUDE_8_REACH, mode=Mode.PRIVATE) & part.part
    add(cut_extrude_8_tool1.solids().sort_by_distance((4.5, 148.5, -1.2))[0], mode=Mode.SUBTRACT)
    add(cut_extrude_8_tool2.solids().sort_by_distance((27.5, 148.5, -1.2))[0], mode=Mode.SUBTRACT)

    # Ребро-кромка5 strip (across the edge) → Ребро-кромка5 strip cut (cut)
    with BuildSketch(Plane(origin=(6, 150, -1.2), x_dir=(0, -1, 0), z_dir=(1, 0, 0))):
        with Locations((-1.2, -0.6)):
            Rectangle(SM_EDGE_FLANGE_5_STRIP_W, SM_EDGE_FLANGE_5_STRIP_H)
    extrude(amount=SM_EDGE_FLANGE_5_STRIP_CUT_DEPTH, mode=Mode.SUBTRACT)

    # Ребро-кромка5 section (across the edge) → Ребро-кромка5 (add)
    with BuildSketch(Plane(origin=(6, 150, -1.2), x_dir=(0, -1, 0), z_dir=(1, 0, 0))):
        with BuildLine():
            Line((0, 0.7366), (0, 18.8))
            Line((0, 18.8), (1.2, 18.8))
            Line((1.2, 18.8), (1.2, 0.7366))
            ThreePointArc((1.2, 0.7366), (1.415745145, 0.215745145), (1.9366, 0))
            Line((1.9366, 0), (1.9366, -1.2))
            ThreePointArc((1.9366, -1.2), (0.567217008, -0.632782992), (0, 0.7366))
        make_face()
    extrude(amount=SM_EDGE_FLANGE_5_DEPTH)

    # Эскиз40 → Вырез-Вытянуть9 (cut, up to next)
    with BuildSketch(Plane(origin=(0, 150, 0), x_dir=(1, 0, 0), z_dir=(0, 1, 0)), mode=Mode.PRIVATE) as cut_extrude_9_sk1:
        with Locations(Location((16, 10.6, 0), (0, 0, 270))):
            Circle(SKETCH_40_R)
    cut_extrude_9_tool1 = extrude(cut_extrude_9_sk1.sketch, amount=-CUT_EXTRUDE_9_REACH, mode=Mode.PRIVATE) & part.part
    add(cut_extrude_9_tool1.solids().sort_by_distance((16, 150, -10.6))[0], mode=Mode.SUBTRACT)


solid = part.part
